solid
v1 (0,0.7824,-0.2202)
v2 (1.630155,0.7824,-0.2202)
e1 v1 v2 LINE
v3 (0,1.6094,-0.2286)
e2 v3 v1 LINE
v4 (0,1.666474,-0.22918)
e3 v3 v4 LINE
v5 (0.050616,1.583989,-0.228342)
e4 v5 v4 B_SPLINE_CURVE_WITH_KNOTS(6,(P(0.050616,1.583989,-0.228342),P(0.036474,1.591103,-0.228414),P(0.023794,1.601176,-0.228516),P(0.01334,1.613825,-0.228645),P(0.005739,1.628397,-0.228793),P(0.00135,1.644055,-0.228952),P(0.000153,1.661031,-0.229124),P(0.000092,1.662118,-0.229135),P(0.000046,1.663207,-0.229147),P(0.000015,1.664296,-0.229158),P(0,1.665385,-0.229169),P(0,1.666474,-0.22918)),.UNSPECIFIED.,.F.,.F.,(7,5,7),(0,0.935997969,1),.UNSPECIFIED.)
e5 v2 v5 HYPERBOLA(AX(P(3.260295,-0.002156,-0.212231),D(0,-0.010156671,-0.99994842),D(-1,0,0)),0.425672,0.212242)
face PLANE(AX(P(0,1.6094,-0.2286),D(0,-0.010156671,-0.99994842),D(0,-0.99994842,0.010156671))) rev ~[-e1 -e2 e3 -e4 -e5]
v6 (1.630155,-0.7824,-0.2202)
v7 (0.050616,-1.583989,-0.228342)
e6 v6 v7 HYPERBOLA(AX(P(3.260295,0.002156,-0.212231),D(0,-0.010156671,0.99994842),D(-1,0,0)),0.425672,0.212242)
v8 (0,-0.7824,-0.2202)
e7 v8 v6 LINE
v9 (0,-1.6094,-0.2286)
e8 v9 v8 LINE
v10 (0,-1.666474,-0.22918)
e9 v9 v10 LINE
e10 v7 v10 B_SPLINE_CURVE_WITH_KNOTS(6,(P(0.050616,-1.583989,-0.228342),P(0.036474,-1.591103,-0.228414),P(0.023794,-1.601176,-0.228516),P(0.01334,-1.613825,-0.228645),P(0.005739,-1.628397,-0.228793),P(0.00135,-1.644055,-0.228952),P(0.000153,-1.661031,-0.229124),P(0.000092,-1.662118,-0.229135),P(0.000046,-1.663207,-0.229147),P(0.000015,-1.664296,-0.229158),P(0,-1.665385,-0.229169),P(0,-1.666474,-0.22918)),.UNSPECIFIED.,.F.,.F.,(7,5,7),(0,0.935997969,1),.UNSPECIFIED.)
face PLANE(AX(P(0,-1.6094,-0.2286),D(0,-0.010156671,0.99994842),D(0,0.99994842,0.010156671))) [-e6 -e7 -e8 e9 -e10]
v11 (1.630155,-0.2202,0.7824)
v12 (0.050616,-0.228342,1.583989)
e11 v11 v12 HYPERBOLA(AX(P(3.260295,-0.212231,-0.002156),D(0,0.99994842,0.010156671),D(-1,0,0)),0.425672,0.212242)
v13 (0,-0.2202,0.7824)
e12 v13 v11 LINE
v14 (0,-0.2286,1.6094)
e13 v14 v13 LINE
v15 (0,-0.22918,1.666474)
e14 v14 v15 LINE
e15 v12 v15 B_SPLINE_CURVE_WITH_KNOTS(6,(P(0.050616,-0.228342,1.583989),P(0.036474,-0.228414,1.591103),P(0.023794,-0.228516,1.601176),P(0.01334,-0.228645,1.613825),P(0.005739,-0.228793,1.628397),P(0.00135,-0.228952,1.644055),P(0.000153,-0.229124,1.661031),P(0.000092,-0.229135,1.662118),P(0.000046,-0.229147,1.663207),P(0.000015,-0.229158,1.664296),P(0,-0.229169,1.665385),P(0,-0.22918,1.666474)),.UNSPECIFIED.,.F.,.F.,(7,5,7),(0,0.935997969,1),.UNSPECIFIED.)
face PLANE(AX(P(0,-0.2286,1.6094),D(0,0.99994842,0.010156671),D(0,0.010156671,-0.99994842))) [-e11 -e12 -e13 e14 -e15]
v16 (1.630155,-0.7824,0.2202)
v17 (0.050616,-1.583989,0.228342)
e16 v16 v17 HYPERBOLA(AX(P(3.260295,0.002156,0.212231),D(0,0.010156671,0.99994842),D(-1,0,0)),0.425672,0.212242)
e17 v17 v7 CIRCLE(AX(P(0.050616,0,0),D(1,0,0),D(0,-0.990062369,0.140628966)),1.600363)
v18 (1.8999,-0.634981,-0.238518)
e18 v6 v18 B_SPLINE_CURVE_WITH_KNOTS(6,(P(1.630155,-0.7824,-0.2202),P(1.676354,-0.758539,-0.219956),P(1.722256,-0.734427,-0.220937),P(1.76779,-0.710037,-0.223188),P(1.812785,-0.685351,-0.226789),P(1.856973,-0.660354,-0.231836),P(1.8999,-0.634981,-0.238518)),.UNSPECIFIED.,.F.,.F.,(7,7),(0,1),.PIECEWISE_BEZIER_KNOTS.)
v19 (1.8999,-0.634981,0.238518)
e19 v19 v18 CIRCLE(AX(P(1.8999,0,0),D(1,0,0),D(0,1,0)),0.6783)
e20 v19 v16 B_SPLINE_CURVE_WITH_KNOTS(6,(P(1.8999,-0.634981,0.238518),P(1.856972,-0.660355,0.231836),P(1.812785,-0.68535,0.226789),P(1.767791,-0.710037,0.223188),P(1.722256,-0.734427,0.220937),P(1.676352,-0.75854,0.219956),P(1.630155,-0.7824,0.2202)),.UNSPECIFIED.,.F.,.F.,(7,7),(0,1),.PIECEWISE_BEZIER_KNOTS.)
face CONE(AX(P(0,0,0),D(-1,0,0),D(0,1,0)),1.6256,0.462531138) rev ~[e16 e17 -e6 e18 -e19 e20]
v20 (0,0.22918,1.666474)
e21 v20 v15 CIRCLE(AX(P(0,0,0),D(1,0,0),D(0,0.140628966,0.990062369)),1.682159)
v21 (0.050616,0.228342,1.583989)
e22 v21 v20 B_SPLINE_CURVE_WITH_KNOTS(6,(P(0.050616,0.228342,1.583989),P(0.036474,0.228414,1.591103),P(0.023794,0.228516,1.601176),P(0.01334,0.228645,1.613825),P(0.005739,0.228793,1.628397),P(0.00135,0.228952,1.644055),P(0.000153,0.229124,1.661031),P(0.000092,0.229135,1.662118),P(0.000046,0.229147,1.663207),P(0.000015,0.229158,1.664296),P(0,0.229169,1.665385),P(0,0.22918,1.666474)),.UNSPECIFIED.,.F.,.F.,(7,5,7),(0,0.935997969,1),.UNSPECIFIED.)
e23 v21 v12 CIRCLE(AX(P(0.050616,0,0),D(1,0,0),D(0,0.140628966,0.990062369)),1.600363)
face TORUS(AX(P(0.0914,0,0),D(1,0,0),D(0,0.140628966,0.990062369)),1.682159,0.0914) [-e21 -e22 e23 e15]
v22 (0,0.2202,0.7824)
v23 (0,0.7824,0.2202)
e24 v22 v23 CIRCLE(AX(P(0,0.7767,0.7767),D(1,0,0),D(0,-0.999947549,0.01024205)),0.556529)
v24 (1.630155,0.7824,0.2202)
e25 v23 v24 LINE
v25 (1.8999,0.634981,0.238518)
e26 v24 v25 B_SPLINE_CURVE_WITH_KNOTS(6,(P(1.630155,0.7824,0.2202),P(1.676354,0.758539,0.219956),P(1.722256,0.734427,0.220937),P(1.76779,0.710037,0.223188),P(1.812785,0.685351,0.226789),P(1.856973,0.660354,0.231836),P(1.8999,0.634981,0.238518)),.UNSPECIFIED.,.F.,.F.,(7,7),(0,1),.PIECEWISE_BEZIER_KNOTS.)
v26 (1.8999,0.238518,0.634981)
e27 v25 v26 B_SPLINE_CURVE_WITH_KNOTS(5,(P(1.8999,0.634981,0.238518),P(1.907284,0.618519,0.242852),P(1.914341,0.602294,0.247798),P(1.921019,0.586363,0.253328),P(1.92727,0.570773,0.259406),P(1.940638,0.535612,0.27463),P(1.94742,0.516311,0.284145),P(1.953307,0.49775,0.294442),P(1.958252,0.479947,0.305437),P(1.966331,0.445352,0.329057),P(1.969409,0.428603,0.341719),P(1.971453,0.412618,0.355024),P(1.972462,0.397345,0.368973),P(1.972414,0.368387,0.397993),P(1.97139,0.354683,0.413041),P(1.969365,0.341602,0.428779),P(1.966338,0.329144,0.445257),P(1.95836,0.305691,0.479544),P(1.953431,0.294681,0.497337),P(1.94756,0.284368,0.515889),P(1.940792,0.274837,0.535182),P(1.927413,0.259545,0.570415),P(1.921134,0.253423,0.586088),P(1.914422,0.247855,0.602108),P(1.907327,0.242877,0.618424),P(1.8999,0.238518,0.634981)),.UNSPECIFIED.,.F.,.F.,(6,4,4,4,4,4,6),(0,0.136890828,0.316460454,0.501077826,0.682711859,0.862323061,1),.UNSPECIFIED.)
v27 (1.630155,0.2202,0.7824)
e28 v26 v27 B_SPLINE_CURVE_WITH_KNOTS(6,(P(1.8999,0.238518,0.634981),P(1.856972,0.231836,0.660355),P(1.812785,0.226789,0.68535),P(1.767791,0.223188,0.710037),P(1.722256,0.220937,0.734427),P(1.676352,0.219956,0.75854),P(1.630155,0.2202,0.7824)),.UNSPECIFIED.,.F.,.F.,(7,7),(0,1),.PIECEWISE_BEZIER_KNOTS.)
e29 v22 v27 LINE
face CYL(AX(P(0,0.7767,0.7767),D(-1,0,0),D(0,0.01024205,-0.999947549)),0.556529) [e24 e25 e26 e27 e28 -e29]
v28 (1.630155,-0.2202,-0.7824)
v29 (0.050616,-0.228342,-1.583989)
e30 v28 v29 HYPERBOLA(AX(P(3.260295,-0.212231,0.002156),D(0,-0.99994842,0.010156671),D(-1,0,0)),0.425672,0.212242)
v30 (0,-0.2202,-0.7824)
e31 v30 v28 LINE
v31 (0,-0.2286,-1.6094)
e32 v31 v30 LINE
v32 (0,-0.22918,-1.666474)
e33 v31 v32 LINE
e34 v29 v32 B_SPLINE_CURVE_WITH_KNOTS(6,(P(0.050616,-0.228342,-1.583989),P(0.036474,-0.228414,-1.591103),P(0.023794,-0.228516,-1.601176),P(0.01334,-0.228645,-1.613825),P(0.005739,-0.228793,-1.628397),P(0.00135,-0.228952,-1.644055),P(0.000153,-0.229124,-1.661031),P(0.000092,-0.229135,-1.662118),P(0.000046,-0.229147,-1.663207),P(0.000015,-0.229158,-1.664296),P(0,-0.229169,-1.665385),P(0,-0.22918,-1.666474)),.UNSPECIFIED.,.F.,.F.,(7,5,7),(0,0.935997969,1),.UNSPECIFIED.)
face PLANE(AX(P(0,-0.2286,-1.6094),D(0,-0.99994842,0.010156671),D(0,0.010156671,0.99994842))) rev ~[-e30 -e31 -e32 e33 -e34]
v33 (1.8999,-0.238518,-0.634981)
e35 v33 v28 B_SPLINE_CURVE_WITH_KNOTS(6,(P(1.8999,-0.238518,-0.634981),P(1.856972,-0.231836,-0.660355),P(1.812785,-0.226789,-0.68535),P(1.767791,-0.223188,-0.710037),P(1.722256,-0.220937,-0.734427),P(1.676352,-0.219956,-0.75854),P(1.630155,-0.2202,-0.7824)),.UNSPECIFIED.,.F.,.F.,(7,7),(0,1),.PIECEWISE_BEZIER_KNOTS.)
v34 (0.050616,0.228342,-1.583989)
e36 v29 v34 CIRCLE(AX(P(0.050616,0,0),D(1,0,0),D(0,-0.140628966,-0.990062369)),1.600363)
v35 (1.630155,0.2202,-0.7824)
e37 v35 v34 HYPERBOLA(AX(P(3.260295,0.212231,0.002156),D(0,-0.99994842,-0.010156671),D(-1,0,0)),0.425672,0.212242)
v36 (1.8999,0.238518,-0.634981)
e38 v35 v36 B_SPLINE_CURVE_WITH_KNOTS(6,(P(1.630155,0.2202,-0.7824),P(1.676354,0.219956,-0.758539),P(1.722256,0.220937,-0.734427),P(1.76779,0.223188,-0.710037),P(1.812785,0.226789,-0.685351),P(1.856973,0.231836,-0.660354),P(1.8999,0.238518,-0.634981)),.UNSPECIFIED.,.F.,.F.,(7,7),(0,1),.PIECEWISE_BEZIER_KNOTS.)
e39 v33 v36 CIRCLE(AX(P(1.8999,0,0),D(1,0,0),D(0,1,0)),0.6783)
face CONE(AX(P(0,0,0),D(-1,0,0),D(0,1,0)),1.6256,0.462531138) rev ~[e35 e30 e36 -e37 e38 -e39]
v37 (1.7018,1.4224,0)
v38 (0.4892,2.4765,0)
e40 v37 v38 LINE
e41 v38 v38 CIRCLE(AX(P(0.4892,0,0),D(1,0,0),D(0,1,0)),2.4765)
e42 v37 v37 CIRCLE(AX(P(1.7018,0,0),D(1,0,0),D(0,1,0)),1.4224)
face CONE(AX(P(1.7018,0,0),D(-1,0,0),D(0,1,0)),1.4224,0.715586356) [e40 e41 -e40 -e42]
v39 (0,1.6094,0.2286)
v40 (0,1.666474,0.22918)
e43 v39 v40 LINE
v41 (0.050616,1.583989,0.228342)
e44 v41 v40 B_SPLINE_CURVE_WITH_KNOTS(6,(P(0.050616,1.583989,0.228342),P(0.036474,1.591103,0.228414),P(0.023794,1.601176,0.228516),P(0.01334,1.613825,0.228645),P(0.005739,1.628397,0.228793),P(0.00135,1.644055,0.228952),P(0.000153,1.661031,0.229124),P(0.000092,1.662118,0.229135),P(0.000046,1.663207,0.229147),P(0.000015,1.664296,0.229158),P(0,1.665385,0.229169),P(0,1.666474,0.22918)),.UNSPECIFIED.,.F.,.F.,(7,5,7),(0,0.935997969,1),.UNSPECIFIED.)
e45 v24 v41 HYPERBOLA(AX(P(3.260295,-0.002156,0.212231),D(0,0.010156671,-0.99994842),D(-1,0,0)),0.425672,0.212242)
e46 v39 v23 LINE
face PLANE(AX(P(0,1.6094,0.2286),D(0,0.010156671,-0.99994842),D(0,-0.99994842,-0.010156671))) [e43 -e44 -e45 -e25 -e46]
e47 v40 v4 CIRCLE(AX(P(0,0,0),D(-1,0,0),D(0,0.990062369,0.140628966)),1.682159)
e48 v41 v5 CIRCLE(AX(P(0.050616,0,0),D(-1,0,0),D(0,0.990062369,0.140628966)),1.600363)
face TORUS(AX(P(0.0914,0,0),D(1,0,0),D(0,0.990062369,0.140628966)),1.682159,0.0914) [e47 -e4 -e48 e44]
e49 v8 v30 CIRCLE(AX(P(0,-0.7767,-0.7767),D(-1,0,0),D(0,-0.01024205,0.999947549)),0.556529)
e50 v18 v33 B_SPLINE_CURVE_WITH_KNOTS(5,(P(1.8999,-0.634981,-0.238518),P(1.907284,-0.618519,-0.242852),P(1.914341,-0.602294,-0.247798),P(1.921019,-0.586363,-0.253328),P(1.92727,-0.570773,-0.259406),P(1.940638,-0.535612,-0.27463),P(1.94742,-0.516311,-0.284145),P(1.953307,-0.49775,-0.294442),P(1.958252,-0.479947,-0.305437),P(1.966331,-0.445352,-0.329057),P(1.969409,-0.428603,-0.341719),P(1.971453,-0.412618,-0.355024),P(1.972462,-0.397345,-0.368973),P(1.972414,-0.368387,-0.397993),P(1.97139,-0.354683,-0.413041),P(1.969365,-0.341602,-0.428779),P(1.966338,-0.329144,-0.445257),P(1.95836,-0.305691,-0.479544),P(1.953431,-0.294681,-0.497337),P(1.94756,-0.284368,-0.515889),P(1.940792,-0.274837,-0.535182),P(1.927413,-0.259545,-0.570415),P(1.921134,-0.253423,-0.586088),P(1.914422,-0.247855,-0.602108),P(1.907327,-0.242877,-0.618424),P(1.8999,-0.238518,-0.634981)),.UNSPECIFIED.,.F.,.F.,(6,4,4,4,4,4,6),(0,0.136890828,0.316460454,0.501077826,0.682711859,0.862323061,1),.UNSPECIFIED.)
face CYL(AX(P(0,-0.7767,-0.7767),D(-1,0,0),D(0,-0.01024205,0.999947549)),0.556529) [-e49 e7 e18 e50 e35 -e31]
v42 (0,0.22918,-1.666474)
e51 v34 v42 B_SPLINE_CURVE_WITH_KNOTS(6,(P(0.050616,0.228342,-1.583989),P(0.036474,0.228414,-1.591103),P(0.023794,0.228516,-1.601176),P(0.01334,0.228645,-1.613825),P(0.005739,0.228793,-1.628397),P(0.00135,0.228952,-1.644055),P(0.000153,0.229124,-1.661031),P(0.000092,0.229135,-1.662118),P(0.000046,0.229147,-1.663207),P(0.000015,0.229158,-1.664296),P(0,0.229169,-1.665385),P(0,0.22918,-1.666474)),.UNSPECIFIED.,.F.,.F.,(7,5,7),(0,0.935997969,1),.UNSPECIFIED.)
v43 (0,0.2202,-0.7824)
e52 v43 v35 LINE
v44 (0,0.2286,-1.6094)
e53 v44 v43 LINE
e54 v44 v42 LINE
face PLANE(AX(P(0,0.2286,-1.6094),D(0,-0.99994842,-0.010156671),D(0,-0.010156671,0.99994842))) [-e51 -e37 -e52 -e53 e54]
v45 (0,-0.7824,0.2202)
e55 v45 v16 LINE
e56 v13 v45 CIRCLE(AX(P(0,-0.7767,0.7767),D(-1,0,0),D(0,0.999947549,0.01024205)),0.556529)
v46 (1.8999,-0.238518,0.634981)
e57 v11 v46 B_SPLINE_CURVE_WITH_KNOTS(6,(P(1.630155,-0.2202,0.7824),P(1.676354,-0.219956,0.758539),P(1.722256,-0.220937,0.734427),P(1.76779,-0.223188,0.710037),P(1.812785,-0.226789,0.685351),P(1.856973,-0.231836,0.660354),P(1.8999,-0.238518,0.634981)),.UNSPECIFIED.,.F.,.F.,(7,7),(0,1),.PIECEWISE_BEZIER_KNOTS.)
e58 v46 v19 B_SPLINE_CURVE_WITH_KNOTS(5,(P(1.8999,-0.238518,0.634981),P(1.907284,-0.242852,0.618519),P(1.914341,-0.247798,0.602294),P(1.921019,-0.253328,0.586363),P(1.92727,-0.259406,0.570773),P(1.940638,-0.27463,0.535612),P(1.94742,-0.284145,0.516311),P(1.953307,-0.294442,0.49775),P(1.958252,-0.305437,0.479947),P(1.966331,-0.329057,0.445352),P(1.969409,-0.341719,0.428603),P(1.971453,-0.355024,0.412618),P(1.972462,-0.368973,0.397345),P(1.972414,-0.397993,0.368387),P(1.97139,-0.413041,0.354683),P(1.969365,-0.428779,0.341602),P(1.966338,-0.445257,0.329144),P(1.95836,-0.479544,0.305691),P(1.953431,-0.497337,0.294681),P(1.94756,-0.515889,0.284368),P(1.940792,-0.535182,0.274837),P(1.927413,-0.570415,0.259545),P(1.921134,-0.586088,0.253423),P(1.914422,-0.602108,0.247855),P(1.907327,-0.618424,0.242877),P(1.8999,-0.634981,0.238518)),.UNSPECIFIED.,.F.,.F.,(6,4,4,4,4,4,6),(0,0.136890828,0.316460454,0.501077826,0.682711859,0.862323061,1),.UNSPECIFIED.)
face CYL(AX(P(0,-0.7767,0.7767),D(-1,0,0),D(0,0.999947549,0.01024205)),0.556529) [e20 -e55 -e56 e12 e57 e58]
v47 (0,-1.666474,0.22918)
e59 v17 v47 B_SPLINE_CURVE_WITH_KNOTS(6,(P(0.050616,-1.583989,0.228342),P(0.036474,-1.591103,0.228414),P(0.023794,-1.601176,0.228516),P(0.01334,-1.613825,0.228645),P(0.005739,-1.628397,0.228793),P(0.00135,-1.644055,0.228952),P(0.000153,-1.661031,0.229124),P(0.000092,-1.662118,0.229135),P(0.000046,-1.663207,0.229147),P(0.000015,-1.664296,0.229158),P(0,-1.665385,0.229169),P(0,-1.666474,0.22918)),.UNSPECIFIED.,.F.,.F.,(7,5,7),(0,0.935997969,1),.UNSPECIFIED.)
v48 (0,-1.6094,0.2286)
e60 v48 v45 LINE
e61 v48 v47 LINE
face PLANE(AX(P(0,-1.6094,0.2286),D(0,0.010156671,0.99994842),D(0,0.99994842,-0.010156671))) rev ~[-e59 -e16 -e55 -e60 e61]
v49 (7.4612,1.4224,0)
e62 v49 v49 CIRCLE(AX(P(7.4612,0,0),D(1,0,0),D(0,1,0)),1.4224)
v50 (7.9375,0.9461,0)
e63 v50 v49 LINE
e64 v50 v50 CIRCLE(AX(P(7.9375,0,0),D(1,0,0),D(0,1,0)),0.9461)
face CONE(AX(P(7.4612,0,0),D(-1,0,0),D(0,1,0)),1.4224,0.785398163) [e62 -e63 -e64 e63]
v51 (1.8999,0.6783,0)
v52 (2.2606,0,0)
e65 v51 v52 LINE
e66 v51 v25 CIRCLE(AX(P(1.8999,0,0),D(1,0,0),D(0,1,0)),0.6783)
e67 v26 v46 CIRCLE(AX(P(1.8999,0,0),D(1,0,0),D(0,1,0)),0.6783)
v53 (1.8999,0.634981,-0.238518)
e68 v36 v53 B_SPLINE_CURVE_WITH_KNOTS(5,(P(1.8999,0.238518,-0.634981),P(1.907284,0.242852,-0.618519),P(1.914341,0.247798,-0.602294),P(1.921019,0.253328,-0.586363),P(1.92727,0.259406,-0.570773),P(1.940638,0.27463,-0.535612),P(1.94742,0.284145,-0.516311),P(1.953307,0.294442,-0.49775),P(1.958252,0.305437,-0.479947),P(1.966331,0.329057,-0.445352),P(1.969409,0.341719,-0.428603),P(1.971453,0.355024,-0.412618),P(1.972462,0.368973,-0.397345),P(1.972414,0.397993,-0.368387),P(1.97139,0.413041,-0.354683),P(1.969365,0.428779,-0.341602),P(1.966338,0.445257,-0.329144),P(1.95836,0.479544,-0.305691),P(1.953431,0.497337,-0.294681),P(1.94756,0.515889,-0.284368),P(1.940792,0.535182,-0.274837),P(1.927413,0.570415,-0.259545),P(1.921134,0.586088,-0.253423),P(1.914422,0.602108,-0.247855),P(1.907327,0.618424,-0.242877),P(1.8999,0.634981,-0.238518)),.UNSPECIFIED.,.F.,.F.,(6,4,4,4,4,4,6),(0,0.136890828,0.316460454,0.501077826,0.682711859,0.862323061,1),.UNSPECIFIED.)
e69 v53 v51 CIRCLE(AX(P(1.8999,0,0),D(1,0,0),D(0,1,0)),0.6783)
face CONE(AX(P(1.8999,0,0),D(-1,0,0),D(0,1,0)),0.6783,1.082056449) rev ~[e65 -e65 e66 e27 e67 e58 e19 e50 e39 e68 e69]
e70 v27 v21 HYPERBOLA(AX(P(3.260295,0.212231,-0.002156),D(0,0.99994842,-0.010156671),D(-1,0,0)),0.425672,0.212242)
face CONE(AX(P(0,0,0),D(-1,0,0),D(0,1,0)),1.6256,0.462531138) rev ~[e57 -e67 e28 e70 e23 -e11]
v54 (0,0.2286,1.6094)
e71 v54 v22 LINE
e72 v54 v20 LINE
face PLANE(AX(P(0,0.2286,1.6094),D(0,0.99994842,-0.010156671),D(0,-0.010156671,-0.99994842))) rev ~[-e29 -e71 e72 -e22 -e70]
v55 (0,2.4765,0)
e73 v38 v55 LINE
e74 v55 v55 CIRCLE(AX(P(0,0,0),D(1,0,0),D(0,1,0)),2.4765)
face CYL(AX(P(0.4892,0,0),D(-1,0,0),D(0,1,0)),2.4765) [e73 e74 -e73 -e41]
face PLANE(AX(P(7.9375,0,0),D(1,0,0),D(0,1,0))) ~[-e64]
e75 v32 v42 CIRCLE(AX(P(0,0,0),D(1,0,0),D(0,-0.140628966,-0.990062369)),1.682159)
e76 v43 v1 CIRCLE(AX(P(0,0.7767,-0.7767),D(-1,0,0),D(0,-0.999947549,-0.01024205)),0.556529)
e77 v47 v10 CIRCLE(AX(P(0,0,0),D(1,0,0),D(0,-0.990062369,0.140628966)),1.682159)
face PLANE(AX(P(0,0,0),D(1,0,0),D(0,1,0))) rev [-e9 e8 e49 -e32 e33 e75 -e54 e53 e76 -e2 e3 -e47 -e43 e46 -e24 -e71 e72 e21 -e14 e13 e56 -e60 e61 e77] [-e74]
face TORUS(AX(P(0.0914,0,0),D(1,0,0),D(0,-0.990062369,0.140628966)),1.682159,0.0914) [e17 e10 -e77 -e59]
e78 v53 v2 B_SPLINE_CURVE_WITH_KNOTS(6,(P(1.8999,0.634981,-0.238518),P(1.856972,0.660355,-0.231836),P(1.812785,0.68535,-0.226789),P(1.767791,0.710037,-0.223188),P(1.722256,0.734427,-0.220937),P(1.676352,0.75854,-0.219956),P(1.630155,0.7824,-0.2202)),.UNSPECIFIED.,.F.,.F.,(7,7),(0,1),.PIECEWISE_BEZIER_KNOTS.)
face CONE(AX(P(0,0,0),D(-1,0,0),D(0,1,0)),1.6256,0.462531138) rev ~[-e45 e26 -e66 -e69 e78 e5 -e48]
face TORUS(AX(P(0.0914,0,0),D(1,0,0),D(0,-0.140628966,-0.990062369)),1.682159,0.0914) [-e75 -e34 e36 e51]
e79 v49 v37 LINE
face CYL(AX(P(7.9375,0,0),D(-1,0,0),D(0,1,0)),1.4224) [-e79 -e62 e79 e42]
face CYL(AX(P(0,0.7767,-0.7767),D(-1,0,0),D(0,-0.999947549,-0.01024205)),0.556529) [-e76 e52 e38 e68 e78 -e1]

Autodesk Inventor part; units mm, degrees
ref_plane "YZ Plane" through (0, 0, 0) normal (1, 0, 0) x (0, 1, 0)
ref_plane "XZ Plane" through (0, 0, 0) normal (0, 1, 0) x (-1, 0, 0)
sketch "Sketch1" plane through (0, 0, 0) normal (0, 0, 1) x (1, 0, 0)
  line L0 (2.2606, 0) -> (7.9375, 0)
  line L1 (7.9375, 0) -> (7.9375, 1.4224)
  line L2 (7.9375, 1.4224) -> (1.7018, 1.4224)
  line L3 (0.4892, 2.4765) -> (0, 2.4765)
  line L4 (-1.5875, 0) -> (9.525, 0) projected
  line L5 (0, -0.4953) -> (0, 2.9718) projected
  line L6 (0, 1.6256) -> (1.8999, 0.6783)
  line L7 (1.8999, 0.6783) -> (2.2606, 0)
  line L8 (1.7018, 1.4224) -> (0.4892, 2.4765)
  line L9 (0, 2.4765) -> (0, 1.6256)
  dimension "d2" = 2.8448
  dimension "d3" = 4.953
  dimension "d4" = 2.2606
  dimension "d5" = 3.2512
  dimension "d6" = 26.5
  dimension "d7" = 62
  dimension "d13" = 41
  dimension "d14" = 1.7018
  dimension "d15" = 7.9375
revolve "Body" add sketch "Sketch1" angle 360 about axis through (2.2606, 0, 0) along (1, 0, 0) contours L7 L6 L5 L3 L8 L2 L1 L0
sketch "Sketch2" plane through (0, 0, 0) normal (-1, 0, 0) x (0, 0, 1)
  line L0 (0, -3.4671) -> (0, 3.4671) projected
  line L1 (-3.4671, 0) -> (3.4671, 0) projected
  line L2 (0, 1.6256) -> (0, 0) construction
  line L3 (0, 0) -> (1.6256, 0) construction
  arc A0 (0.5419, 0) -> (0, 0.5419) centre (0, 0) ccw
  line L4 (0, 0) -> (0.7947, 0.7947) construction
  arc A1 (0.8128, 0) -> (0, 0.8128) centre (0, 0) ccw construction
  line L5 (0.2286, 1.6094) -> (0.2202, 0.7824)
  line L6 (1.6094, 0.2286) -> (0.7824, 0.2202)
  arc A2 (0.2202, 0.7824) -> (0.7824, 0.2202) centre (0.7767, 0.7767) ccw
  arc A3 (1.6256, 0) -> (1.6094, 0.2286) centre (0, 0) ccw
  arc A4 (0.2286, 1.6094) -> (0, 1.6256) centre (0, 0) ccw
  arc A5 (1.6094, 0.2286) -> (0.2286, 1.6094) centre (0, 0) ccw
  line L7 (0.2286, -1.6094) -> (0.2202, -0.7824)
  line L8 (1.6094, -0.2286) -> (0.7824, -0.2202)
  arc A6 (0.7824, -0.2202) -> (0.2202, -0.7824) centre (0.7767, -0.7767) ccw
  arc A7 (1.6094, -0.2286) -> (1.6256, 0) centre (0, 0) ccw
  arc A8 (0, -1.6256) -> (0.2286, -1.6094) centre (0, 0) ccw
  arc A9 (0.2286, -1.6094) -> (1.6094, -0.2286) centre (0, 0) ccw
  line L9 (-0.2286, 1.6094) -> (-0.2202, 0.7824)
  line L10 (-1.6094, 0.2286) -> (-0.7824, 0.2202)
  arc A10 (-0.7824, 0.2202) -> (-0.2202, 0.7824) centre (-0.7767, 0.7767) ccw
  arc A11 (-1.6094, 0.2286) -> (-1.6256, 0) centre (0, 0) ccw
  arc A12 (0, 1.6256) -> (-0.2286, 1.6094) centre (0, 0) ccw
  arc A13 (-0.2286, 1.6094) -> (-1.6094, 0.2286) centre (0, 0) ccw
  arc A14 (-1.6094, -0.2286) -> (-0.2286, -1.6094) centre (0, 0) ccw
  arc A15 (-0.2286, -1.6094) -> (0, -1.6256) centre (0, 0) ccw
  arc A16 (-1.6256, 0) -> (-1.6094, -0.2286) centre (0, 0) ccw
  line L11 (-1.6094, -0.2286) -> (-0.7824, -0.2202)
  arc A17 (-0.2202, -0.7824) -> (-0.7824, -0.2202) centre (-0.7767, -0.7767) ccw
  line L12 (-0.2286, -1.6094) -> (-0.2202, -0.7824)
  dimension "d18" = 45
  dimension "d19" = 1.0837
  dimension "d20" = 1.6256
  dimension "d21" = 3.2512
  dimension "d22" = 0.2286
extrude "Slot" add sketch "Sketch2" against normal up to next contours A2 L5 A5 L6 | L9 A10 L10 A13 | L7 A6 L8 A9 | A14 L11 A17 L12
fillet "Fillet1" radius 0.0914 4 edges at (0, 1.6256, 0) (0, 0, 1.6256) (0, -1.6256, 0) (0, 0, -1.6256)
thread "Thread" size "4-40 UNC" class "2A" standard "ANSI Unified Screw Threads" length 4.6482
chamfer "Chamfer1" distance 0.4763 distance2 0.4763 1 edges at (7.9375, -1.4224, 0) measured on face at (7.9375, -0.0186, 0.3144)
ref_plane "Work Plane2" through (2.032, 0, 0) normal (0, 1, 0) x (1, 0, 0)
equation "\"d2\" = GD"
equation "\"d3\" = KOD"
equation "\"d4\" = INTI"
equation "\"d5\" = SDM"
equation "\"d13\" = 0.5 * SEWI"
equation "\"d14\" = KOH"
equation "\"d15\" = NLG"
equation "\"d19\" = 0.333333 * SDM"
equation "\"d20\" = 0.5 * SDM"
equation "\"d21\" = SDM"
equation "\"d22\" = 0.5 * SBR"
equation "\"d45\" = INTI"
equation "\"d25\" = 0.2 * SBR"
equation "\"d9\" = GEL"
equation "\"d11\" = -0.5 * SPD + 0.5 * GD"
equation "\"d12\" = GUL"
equation "\"GD\" = NND"
equation "\"NLG\" = 7.9375"
equation "\"GEL\" = 4.6482"
equation "\"KOD\" = 4.953"
equation "\"KOH\" = 1.7018"
equation "\"SDM\" = 3.2512"
equation "\"INTI\" = 2.2606"
equation "\"SBR\" = 0.4572"
equation "\"GUL\" = 0.75 * GAL"
equation "\"SPD\" = 1.8923"
equation "\"SEWI\" = 82deg"
equation "\"d0\" = NLG"
equation "\"d1\" = KOH"
equation "\"d17\" = SDM"
equation "\"TOA\" = 30deg"
equation "\"THREADDIA\" = 2.8448"
equation "\"BDM\" = NND"
equation "\"NND\" = 2.8448"
equation "\"GAL\" = 0.635"
equation "\"GD1\" = SPD"
properties part number "ANSI B18.6.3 - 4-40 x 5/16, CRFCHMSTII(5)" material "Steel, Mild"
